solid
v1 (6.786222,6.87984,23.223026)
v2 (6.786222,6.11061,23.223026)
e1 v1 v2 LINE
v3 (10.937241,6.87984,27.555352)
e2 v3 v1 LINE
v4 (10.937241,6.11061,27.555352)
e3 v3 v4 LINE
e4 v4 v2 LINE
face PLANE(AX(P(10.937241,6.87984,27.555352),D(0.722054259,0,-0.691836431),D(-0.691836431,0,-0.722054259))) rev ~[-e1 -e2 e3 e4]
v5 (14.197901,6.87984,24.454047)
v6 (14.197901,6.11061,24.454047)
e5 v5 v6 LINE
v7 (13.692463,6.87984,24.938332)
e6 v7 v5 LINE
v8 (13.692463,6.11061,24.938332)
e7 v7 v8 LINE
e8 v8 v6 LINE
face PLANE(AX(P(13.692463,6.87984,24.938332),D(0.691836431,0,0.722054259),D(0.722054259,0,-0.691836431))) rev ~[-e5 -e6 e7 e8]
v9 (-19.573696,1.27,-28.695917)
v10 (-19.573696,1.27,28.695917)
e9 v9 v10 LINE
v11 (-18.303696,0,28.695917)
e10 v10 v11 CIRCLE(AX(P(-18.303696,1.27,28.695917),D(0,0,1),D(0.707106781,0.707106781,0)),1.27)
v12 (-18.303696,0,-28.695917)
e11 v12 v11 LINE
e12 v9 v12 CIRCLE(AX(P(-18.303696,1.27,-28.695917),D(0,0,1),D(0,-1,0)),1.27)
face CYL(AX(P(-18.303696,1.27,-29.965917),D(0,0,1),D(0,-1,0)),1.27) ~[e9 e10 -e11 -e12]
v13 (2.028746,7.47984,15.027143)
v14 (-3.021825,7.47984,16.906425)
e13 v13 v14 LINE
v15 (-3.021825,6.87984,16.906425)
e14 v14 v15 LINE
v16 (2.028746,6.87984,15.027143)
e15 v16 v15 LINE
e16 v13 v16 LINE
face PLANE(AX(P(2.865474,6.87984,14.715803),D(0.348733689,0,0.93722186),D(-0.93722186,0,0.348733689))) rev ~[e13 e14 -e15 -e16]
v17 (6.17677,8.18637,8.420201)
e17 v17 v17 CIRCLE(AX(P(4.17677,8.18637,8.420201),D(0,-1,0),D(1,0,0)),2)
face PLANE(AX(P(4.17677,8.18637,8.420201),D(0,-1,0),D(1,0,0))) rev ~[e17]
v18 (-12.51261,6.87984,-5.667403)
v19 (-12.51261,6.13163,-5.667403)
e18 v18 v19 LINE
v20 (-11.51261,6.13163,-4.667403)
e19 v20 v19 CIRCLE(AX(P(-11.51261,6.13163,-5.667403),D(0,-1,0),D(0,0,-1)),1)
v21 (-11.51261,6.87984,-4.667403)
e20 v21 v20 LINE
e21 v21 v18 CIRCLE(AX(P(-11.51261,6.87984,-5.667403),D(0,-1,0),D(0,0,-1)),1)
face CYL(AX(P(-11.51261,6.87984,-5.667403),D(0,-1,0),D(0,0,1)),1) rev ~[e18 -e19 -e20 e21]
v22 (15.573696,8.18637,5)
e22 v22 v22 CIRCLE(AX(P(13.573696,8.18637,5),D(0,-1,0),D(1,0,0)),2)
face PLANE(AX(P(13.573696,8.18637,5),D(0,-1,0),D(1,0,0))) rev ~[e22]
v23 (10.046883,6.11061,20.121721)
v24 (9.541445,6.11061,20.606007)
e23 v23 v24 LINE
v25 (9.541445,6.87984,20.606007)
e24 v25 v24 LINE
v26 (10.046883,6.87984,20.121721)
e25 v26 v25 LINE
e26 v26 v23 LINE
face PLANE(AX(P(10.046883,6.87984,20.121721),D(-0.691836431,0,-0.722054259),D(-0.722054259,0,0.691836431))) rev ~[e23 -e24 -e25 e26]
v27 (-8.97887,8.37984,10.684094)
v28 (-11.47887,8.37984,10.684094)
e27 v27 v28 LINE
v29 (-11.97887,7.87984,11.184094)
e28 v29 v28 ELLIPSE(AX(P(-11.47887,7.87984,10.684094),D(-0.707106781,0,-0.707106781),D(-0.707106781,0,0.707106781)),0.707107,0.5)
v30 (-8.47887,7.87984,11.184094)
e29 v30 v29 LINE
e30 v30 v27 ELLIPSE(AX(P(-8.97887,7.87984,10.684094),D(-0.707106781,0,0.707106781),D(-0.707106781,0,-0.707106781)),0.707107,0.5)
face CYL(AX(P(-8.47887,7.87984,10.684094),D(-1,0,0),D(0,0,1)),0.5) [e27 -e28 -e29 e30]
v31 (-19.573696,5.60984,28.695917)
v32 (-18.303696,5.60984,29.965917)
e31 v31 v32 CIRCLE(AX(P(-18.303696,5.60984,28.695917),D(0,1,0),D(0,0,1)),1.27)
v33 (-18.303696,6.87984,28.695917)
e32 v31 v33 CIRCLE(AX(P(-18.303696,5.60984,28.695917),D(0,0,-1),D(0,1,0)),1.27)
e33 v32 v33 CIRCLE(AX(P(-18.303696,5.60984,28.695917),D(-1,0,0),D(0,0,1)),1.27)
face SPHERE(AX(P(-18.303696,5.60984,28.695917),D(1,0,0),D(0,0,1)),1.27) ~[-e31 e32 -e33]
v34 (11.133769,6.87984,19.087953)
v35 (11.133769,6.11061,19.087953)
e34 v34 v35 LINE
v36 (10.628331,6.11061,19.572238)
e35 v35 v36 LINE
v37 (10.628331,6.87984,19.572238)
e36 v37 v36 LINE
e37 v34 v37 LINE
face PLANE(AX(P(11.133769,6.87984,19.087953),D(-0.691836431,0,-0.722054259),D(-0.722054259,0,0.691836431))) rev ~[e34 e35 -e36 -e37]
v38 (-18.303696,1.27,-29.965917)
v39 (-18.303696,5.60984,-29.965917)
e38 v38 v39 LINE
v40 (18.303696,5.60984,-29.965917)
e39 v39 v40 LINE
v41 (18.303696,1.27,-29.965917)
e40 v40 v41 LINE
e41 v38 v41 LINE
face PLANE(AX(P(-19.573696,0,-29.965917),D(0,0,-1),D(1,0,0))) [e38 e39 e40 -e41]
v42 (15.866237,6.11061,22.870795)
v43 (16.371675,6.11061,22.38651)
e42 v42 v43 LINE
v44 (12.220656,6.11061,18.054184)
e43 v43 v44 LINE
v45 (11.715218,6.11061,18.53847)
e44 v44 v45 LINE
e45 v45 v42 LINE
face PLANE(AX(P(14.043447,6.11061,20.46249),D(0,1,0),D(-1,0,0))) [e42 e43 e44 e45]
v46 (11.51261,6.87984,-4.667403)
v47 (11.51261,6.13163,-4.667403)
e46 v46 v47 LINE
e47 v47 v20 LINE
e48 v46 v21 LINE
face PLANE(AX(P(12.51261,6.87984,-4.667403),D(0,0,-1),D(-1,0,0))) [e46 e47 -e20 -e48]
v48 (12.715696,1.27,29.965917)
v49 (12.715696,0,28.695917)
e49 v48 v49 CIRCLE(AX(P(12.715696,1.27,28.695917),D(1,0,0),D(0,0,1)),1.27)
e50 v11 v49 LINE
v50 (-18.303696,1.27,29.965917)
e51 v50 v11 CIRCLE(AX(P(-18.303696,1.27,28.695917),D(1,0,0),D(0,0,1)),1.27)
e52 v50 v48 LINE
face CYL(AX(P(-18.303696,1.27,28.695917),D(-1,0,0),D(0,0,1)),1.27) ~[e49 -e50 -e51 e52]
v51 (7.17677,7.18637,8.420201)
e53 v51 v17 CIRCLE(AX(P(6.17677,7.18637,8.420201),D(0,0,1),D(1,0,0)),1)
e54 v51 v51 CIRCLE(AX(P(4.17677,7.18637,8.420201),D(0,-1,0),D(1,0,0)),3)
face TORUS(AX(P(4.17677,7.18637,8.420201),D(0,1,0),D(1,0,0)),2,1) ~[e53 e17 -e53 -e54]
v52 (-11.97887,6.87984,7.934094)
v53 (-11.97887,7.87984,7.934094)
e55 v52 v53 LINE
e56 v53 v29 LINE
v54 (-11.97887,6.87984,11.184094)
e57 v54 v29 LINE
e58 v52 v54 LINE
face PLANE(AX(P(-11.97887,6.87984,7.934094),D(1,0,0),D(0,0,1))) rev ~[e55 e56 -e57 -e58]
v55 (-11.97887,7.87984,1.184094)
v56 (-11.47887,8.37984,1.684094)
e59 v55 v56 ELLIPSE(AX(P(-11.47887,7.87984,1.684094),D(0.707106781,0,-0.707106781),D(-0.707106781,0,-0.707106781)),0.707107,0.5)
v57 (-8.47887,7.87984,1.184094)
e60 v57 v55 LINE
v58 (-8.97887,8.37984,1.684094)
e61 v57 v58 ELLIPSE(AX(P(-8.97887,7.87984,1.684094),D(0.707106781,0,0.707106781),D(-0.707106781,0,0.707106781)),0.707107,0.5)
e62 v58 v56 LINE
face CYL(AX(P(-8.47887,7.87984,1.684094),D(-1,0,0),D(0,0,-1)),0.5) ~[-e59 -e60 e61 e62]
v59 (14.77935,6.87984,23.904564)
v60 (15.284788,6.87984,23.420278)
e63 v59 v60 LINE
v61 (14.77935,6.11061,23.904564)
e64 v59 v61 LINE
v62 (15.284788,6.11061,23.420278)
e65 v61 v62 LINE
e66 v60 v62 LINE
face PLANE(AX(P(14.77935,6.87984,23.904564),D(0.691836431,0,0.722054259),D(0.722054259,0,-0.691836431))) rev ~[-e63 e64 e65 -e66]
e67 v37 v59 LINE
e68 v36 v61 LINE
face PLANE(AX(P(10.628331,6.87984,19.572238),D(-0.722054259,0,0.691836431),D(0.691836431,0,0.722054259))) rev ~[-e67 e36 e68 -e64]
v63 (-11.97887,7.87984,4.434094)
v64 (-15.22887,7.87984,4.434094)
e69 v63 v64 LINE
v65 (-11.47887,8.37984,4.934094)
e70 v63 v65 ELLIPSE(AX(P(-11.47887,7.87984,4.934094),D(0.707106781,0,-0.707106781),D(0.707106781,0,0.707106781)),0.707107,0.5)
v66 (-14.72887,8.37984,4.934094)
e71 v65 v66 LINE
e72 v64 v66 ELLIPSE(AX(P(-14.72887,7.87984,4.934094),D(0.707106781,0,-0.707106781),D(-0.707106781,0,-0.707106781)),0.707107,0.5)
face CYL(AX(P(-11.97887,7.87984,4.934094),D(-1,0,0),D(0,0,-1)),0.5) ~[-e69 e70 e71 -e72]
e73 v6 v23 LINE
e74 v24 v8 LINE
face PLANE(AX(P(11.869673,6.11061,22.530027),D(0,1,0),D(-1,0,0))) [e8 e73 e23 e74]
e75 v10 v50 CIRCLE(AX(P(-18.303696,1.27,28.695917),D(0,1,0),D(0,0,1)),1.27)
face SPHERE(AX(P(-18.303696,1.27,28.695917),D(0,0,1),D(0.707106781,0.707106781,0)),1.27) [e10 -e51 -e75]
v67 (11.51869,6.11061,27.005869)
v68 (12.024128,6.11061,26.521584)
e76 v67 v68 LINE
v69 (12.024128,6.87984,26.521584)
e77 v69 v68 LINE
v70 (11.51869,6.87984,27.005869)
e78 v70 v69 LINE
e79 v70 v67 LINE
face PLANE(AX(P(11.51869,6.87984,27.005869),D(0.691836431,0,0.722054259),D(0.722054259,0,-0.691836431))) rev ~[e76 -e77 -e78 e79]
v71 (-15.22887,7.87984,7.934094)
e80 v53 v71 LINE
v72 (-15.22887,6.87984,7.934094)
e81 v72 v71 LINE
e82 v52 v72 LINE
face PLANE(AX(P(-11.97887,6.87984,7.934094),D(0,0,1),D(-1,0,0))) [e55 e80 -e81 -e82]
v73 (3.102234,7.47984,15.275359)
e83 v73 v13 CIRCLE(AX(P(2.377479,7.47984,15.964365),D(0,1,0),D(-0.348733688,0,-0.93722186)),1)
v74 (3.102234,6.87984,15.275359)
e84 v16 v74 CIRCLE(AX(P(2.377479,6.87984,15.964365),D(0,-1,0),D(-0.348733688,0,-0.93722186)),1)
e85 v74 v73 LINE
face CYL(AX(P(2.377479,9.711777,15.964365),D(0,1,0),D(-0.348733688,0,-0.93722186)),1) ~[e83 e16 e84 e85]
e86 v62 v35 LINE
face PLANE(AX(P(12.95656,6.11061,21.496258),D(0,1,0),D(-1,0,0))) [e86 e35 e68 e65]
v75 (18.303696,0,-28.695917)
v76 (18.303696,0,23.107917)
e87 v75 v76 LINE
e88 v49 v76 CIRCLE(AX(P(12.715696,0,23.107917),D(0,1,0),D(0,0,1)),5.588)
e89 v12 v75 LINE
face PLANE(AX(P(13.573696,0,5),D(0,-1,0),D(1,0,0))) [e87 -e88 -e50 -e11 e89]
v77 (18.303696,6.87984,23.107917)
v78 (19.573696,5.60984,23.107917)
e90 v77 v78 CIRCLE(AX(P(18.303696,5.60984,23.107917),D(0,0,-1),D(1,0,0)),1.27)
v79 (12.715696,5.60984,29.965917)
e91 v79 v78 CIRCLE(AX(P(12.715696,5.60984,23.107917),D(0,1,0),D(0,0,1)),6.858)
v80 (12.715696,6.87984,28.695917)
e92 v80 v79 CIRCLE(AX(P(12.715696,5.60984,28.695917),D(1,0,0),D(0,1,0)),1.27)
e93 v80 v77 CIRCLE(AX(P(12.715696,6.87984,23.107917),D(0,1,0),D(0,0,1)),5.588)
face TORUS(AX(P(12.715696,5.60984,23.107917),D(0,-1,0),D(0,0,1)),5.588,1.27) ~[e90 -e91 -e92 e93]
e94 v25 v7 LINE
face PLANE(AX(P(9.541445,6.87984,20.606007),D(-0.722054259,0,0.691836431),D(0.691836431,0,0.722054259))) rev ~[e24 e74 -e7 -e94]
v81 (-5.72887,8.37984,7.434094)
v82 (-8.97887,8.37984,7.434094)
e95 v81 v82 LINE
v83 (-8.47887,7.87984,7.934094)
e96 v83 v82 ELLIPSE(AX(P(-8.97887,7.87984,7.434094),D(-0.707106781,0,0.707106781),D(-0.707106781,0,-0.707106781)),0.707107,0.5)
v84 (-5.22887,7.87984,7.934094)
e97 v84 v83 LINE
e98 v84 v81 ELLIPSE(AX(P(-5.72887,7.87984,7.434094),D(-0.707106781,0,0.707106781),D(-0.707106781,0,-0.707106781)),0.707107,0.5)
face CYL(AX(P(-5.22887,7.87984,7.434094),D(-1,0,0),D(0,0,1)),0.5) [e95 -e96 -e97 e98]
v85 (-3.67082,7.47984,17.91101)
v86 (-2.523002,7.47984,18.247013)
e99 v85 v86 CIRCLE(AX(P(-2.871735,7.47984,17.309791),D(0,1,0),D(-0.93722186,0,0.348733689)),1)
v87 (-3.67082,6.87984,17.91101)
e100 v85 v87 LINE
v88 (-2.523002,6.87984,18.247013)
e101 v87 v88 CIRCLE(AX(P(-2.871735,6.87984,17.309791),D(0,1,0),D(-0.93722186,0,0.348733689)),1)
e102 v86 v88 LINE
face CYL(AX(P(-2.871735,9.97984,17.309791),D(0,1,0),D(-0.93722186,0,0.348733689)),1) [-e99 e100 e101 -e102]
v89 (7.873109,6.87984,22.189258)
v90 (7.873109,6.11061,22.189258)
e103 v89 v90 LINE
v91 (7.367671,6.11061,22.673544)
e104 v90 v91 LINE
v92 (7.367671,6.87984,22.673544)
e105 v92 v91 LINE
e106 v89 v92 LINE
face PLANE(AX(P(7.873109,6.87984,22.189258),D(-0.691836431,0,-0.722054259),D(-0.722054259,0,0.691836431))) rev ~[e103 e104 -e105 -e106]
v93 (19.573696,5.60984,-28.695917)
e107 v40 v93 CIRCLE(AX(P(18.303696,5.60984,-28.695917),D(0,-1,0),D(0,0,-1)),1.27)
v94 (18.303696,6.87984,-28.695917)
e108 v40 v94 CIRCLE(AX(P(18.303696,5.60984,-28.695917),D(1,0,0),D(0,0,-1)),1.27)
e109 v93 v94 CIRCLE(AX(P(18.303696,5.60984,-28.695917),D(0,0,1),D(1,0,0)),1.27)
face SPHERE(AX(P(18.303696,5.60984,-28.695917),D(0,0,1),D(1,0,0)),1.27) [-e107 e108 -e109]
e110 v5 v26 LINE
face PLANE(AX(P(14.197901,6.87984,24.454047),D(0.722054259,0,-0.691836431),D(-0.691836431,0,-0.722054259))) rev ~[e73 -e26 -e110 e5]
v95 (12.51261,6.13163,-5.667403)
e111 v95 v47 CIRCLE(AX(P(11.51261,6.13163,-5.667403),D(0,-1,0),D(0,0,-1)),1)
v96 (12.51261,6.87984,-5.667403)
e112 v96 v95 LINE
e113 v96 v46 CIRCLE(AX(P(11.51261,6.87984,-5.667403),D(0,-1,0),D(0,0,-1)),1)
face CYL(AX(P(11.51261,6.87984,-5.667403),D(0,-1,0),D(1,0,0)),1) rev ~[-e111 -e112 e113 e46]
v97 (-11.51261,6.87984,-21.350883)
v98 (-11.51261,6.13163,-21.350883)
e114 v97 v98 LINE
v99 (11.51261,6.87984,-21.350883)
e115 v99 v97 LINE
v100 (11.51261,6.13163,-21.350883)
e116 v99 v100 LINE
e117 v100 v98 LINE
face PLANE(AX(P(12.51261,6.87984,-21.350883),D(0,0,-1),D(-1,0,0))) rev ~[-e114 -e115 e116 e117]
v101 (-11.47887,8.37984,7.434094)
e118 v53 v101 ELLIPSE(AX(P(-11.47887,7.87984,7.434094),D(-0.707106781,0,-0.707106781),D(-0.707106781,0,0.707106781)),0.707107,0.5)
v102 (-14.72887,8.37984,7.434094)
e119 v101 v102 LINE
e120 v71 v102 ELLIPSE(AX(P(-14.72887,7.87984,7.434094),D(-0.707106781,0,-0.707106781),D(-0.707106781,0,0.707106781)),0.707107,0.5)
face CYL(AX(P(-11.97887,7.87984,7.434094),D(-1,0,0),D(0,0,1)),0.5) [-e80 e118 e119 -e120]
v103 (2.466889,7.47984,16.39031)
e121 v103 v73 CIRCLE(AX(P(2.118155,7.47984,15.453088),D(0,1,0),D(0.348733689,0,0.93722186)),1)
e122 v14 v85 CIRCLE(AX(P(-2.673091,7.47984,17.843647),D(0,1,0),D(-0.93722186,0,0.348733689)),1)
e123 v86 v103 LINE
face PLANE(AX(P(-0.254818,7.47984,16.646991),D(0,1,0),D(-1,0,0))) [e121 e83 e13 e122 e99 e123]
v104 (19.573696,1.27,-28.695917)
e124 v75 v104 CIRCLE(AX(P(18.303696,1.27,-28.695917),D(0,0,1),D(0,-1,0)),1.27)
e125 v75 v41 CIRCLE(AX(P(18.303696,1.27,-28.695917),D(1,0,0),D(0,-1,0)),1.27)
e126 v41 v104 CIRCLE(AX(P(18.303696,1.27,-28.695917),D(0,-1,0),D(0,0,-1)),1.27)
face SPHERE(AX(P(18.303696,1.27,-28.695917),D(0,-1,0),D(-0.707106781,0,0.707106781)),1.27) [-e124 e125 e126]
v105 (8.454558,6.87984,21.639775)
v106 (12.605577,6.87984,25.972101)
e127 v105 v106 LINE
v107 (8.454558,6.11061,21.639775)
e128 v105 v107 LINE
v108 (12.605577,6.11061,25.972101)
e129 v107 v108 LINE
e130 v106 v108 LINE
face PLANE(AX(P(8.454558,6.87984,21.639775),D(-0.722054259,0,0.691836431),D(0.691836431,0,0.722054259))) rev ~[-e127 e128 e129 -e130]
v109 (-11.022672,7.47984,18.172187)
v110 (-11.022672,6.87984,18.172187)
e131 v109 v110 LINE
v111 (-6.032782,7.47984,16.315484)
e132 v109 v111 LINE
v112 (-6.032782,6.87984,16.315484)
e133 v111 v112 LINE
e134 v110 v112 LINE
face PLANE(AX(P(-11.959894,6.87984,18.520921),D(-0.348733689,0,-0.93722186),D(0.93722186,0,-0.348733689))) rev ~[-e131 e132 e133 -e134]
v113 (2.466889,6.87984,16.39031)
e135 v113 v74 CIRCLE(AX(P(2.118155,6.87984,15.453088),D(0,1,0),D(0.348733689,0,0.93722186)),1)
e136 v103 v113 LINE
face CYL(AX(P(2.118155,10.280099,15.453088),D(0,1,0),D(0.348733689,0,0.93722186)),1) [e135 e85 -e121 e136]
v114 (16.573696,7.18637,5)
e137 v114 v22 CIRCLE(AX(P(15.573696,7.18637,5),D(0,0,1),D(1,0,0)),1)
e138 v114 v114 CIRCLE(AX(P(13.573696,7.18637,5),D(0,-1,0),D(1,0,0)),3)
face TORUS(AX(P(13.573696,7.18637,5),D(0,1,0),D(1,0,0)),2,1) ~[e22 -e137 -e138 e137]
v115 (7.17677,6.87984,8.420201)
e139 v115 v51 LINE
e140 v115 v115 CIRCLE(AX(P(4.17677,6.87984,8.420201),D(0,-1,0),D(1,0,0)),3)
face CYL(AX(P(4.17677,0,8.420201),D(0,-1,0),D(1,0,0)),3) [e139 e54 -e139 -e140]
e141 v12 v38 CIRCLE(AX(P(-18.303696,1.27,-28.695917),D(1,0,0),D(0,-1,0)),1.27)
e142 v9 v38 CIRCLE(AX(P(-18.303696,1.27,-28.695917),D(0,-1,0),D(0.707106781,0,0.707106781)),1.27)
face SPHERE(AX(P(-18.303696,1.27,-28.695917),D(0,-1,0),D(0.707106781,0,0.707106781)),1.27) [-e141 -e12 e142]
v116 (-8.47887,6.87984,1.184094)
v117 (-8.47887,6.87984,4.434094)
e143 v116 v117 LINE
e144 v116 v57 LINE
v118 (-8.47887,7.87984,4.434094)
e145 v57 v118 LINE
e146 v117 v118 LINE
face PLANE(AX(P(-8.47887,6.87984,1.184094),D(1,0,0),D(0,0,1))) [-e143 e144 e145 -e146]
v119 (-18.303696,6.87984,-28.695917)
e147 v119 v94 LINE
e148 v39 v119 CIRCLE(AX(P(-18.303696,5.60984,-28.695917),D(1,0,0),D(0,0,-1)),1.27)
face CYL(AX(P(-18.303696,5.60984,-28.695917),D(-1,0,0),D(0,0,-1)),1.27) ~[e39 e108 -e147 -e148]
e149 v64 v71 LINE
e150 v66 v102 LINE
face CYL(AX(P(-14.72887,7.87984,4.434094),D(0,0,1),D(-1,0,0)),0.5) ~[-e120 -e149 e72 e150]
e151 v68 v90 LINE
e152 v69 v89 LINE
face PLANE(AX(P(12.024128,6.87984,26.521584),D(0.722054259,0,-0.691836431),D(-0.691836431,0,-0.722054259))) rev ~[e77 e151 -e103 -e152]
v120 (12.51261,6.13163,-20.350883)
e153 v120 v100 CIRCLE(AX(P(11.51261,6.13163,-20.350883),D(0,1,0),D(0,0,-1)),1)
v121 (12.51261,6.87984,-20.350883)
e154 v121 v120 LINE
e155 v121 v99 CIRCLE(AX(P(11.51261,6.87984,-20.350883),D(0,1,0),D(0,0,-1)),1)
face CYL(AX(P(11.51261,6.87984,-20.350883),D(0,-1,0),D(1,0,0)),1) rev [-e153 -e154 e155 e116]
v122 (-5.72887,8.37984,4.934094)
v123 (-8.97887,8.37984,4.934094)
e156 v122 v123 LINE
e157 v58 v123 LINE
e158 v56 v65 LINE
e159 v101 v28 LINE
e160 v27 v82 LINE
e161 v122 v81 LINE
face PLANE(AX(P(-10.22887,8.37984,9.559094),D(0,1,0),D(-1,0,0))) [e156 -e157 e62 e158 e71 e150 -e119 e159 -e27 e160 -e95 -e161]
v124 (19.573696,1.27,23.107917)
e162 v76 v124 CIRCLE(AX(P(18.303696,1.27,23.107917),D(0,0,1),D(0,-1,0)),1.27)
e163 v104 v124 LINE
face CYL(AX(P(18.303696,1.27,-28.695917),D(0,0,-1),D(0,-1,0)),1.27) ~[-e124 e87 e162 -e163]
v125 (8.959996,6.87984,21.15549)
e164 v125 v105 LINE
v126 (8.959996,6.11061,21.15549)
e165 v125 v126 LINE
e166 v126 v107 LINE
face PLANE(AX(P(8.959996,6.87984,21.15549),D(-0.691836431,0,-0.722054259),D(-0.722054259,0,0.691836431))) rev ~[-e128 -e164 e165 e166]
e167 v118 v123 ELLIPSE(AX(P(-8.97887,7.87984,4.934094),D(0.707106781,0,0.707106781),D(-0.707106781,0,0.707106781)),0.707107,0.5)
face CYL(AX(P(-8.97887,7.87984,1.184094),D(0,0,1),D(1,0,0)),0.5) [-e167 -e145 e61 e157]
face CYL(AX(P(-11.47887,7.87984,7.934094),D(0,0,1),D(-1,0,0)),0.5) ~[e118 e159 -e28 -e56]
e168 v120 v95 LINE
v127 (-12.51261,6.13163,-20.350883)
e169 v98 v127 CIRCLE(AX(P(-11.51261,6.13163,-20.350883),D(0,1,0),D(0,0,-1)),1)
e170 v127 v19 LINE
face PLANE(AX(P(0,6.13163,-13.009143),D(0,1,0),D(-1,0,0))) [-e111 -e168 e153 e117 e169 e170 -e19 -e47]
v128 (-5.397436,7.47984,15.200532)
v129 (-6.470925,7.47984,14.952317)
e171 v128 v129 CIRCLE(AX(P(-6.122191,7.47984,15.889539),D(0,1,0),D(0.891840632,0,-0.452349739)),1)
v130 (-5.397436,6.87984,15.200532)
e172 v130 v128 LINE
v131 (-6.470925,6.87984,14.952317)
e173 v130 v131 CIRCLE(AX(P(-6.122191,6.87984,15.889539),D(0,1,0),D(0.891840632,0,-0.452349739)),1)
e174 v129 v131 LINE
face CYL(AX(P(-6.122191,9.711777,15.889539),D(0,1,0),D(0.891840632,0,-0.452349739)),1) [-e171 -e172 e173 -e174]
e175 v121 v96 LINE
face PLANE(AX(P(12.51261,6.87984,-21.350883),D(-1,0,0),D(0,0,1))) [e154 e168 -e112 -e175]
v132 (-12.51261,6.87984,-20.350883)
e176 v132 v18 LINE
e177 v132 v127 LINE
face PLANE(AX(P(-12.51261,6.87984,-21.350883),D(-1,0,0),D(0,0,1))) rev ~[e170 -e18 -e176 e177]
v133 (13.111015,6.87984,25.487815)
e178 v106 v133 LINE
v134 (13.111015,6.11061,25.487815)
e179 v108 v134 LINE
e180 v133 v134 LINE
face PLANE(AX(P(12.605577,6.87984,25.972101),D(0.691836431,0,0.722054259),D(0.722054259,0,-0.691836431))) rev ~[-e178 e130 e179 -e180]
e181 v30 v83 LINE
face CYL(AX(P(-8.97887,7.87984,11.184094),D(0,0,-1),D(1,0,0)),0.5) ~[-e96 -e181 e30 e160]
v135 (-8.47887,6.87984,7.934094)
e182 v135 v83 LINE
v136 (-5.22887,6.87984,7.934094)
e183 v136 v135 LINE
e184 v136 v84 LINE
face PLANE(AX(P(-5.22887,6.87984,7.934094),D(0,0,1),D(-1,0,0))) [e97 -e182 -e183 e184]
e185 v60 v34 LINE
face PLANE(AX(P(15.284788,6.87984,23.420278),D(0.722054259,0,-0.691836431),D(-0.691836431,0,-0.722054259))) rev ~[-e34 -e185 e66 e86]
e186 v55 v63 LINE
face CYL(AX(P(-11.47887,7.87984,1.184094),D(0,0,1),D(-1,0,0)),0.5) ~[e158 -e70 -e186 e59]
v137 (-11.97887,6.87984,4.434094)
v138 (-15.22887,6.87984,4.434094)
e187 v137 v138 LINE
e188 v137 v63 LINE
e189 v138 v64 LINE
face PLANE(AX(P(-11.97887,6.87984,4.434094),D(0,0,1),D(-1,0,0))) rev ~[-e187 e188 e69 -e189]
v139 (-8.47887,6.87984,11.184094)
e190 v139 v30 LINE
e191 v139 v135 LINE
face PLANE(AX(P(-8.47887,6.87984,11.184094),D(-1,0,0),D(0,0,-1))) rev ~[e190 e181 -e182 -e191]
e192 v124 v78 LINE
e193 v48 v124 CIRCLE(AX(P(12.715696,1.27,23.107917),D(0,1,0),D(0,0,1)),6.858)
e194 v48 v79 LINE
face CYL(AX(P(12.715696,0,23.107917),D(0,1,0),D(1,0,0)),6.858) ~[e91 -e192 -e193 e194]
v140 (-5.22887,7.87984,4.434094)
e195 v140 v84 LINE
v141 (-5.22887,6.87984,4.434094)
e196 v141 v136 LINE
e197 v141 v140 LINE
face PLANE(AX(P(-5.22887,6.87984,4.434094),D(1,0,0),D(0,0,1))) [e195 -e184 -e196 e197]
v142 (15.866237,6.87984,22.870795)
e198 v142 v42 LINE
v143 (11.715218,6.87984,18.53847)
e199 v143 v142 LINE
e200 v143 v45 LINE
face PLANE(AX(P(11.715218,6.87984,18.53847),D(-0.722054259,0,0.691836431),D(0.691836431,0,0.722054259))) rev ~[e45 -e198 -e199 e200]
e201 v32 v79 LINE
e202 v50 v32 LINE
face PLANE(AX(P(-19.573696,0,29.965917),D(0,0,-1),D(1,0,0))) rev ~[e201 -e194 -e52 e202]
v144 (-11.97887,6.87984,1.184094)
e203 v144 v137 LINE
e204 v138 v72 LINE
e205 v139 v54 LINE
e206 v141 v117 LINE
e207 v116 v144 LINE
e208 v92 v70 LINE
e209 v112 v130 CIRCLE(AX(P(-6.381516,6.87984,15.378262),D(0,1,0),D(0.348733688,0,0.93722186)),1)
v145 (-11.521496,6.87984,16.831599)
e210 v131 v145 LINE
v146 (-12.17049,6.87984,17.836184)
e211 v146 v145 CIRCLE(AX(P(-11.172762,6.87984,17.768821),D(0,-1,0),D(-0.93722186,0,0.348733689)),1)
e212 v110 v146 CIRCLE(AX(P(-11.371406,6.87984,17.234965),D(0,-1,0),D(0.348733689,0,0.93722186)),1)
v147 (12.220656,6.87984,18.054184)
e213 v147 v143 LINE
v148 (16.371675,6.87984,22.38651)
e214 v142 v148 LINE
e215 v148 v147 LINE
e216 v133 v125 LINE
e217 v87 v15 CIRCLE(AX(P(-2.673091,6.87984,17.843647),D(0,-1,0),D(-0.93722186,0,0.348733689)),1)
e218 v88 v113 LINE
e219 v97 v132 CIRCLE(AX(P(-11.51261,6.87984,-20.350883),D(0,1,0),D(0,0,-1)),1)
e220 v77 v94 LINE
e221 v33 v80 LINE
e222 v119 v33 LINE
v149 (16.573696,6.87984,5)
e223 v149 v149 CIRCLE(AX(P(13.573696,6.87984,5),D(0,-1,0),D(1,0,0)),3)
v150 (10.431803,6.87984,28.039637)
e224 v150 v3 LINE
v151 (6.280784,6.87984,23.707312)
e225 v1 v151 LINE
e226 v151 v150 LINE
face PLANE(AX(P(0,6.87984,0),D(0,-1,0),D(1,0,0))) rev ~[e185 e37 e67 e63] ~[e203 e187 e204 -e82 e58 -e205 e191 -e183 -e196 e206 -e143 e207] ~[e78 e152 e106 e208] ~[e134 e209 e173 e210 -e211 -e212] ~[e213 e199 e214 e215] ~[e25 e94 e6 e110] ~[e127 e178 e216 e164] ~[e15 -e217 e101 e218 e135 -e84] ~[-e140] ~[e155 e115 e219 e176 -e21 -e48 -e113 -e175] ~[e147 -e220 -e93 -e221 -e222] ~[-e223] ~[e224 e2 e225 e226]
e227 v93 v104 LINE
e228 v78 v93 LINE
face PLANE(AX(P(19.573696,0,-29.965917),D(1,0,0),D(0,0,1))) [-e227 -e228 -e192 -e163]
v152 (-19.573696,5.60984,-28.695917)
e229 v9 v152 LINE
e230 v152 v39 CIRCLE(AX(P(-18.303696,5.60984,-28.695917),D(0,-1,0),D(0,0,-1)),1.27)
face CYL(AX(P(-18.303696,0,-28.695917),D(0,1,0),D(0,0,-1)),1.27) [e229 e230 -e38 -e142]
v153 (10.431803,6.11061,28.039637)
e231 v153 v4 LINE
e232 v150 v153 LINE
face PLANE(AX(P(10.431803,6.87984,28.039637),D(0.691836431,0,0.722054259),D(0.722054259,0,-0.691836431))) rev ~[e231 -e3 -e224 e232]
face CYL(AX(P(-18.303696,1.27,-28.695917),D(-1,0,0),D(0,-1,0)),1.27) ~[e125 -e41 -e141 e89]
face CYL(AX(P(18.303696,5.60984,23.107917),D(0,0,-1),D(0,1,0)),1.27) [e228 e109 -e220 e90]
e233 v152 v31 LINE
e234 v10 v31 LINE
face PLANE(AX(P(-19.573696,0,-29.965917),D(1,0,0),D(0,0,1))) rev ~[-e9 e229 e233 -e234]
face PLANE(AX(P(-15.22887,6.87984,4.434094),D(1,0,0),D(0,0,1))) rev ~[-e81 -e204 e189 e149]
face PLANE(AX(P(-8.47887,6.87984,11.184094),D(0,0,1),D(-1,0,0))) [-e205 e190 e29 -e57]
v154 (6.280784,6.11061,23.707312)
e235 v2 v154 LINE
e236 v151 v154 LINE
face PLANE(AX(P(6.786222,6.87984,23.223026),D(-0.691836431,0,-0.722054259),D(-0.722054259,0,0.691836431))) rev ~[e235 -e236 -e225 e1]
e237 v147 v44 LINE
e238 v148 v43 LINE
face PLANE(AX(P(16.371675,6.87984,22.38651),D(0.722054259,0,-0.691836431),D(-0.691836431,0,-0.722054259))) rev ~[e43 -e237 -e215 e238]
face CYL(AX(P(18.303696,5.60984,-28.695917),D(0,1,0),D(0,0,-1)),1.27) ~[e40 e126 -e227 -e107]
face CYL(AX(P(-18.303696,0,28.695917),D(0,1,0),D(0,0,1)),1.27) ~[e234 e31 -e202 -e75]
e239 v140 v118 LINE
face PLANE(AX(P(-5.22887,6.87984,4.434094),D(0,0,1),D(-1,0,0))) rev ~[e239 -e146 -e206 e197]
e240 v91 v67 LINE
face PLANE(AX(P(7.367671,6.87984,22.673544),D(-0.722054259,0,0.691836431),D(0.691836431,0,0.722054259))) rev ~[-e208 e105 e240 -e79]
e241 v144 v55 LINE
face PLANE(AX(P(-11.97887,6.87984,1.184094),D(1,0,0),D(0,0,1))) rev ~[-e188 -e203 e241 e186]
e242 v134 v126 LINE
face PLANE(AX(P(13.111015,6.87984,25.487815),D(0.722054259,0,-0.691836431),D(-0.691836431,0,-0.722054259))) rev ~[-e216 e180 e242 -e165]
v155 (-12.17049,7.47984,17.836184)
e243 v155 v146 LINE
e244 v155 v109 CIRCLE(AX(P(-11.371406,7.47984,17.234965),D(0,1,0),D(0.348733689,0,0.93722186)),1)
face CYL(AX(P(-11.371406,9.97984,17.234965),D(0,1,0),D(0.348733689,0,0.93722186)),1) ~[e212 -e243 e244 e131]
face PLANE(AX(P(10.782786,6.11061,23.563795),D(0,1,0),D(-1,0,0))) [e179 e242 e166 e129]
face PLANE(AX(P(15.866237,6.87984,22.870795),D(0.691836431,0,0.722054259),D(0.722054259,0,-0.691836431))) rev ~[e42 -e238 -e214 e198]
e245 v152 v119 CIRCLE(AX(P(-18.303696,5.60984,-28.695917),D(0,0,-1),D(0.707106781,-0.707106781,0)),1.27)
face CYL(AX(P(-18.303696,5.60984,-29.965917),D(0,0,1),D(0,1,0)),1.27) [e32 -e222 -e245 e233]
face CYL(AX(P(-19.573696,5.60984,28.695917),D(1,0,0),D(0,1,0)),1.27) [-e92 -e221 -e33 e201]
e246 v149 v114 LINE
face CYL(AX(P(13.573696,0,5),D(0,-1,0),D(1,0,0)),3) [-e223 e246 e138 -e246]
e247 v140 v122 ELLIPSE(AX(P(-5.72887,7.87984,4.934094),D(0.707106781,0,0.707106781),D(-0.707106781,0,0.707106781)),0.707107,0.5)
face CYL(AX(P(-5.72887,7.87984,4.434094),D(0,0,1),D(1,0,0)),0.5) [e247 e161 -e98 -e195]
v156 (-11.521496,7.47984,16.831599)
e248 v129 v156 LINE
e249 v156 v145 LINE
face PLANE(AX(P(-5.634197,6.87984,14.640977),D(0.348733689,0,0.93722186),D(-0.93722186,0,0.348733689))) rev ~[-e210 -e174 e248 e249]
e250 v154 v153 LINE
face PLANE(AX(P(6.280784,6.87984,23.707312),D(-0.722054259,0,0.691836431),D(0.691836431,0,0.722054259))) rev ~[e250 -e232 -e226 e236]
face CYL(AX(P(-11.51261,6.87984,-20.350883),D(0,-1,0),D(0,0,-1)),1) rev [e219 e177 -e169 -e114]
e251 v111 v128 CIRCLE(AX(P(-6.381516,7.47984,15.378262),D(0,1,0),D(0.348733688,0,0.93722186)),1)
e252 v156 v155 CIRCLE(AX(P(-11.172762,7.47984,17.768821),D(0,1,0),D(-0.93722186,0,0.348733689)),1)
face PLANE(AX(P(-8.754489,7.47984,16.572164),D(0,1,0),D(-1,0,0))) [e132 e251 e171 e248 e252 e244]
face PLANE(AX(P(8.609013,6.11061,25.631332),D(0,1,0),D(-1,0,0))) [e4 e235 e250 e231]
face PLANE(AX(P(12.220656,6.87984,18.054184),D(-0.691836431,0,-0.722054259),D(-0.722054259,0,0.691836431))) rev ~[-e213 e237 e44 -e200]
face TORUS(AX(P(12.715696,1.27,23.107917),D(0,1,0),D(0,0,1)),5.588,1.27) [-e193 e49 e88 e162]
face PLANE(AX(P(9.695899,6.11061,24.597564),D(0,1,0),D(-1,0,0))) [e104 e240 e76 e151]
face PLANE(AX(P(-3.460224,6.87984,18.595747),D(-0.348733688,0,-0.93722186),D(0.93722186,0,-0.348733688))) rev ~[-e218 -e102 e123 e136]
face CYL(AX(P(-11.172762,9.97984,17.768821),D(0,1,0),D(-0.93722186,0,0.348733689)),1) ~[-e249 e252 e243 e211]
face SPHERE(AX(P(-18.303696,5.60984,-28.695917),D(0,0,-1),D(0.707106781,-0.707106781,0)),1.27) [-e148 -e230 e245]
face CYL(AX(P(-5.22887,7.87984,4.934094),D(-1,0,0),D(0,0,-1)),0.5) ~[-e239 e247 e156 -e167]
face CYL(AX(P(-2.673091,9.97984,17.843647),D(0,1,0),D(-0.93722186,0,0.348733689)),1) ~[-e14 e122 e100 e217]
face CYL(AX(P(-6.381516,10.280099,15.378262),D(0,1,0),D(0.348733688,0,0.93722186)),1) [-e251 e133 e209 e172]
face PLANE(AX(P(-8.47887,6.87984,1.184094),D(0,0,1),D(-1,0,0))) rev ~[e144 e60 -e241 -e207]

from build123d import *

# Parameters (mm, degrees)
F0_W         = 39.1473919153
F0_H         = 59.931833297
F1_DEPTH     = 6.87984
F2_R         = 6.858
F3_R         = 1.27
F4_T1_DEPTH  = 31.0193919153
F4_T3_DEPTH  = 36.6073919153
F4_T5_DEPTH  = 4.33984
F4_T7_DEPTH  = 51.803833297
F4_S11_W     = 1.27
F4_S11_H     = 1.27
F4_T12_DEPTH = 1.27
F4_S17_W     = 1.27
F4_S17_H     = 1.27
F4_T18_DEPTH = 1.27
F4_S23_W     = 1.27
F4_S23_H     = 1.27
F4_T24_DEPTH = 1.27
F4_S29_W     = 1.27
F4_S29_H     = 1.27
F4_T30_DEPTH = 1.27
F4_T34_ANGLE = 90
F4_T36_ANGLE = 90
F5_R         = 3
F6_DEPTH     = 8.18637
F7_R         = 1
F8_W         = 3.5
F8_H         = 3.25
F8_H_2       = 3.5
F8_W_2       = 3.25
F9_DEPTH     = 1.5
F10_R        = 0.5
F11_W        = 25.0252205878
F11_H        = 16.683479771
F12_DEPTH    = 0.74821
F14_DEPTH    = 0.76923
F16_DEPTH    = 0.6
F17_DEPTH    = 0.6
F18_T1_DEPTH = 2.831936667
F18_T3_DEPTH = 3.1
F18_T5_DEPTH = 3.4002586688
F19_T1_DEPTH = 3.1
F19_T3_DEPTH = 3.4002586688
F19_T5_DEPTH = 2.831936667
F20_R        = 1
F21_R        = 1
F22_R        = 1


# Not quite as in the source:
# - a fillet or chamfer that OpenCascade refuses, or shapes differently, is made with other operations: its cross-section is extruded or revolved along the edge and cut away or added


with BuildPart() as f1:
    # F0 (on Front) → F1 (new body)
    with BuildSketch(Plane.XZ):
        Rectangle(F0_W, F0_H)
    extrude(amount=-F1_DEPTH)

    # F2
    f2_edges = [f1.edges().sort_by_distance(p)[0] for p in [
        (19.573696, 3.43992, 29.965917),
    ]]
    fillet(f2_edges, radius=F2_R)

    # F3
    f3_edges = [f1.edges().sort_by_distance(p)[0] for p in [
        (-3.429, 6.87984, 29.965917),
        (-19.573696, 3.43992, 29.965917),
        (-19.573696, 3.43992, -29.965917),
        (-19.573696, 6.87984, 0),
        (-19.573696, 0, 0),
    ]]
    fillet(f3_edges, radius=F3_R)

    # F4: fillet of radius 1.27 on 3 edges, made by hand

    # F4_s2 → F4_t1 (cut)
    with BuildSketch(Plane.YZ.offset(-18.3036959577)):
        with BuildLine():
            ThreePointArc((1.27, 29.9659166485), (0.3719743879, 29.5939422606), (0, 28.6959166485))
            Line((0, 28.6959166485), (0, 29.9659166485))
            Line((0, 29.9659166485), (1.27, 29.9659166485))
        make_face()
    extrude(amount=F4_T1_DEPTH, mode=Mode.SUBTRACT)

    # F4_s4 → F4_t3 (cut)
    with BuildSketch(Plane.YZ.offset(-18.3036959577)):
        with BuildLine():
            ThreePointArc((5.60984, -29.9659166485), (6.5078656121, -29.5939422606), (6.87984, -28.6959166485))
            Line((6.87984, -28.6959166485), (6.87984, -29.9659166485))
            Line((6.87984, -29.9659166485), (5.60984, -29.9659166485))
        make_face()
        with BuildLine():
            ThreePointArc((0, -28.6959166485), (0.3719743879, -29.5939422606), (1.27, -29.9659166485))
            Line((1.27, -29.9659166485), (0, -29.9659166485))
            Line((0, -29.9659166485), (0, -28.6959166485))
        make_face()
    extrude(amount=F4_T3_DEPTH, mode=Mode.SUBTRACT)

    # F4_s6 → F4_t5 (cut)
    with BuildSketch(Plane.XZ.offset(-5.60984)):
        with BuildLine():
            ThreePointArc((18.3036959577, -29.9659166485), (19.2017215698, -29.5939422606), (19.5736959577, -28.6959166485))
            Line((19.5736959577, -28.6959166485), (19.5736959577, -29.9659166485))
            Line((19.5736959577, -29.9659166485), (18.3036959577, -29.9659166485))
        make_face()
    extrude(amount=F4_T5_DEPTH, mode=Mode.SUBTRACT)

    # F4_s8 → F4_t7 (cut)
    with BuildSketch(Plane.XY.offset(-28.6959166485)):
        with BuildLine():
            ThreePointArc((18.3036959577, 0), (19.2017215698, 0.3719743879), (19.5736959577, 1.27))
            Line((19.5736959577, 1.27), (19.5736959577, 0))
            Line((19.5736959577, 0), (18.3036959577, 0))
        make_face()
    extrude(amount=F4_T7_DEPTH, mode=Mode.SUBTRACT)


with BuildPart() as f4_tool10:
    # F4_s11 → F4_t12 (new body)
    with BuildSketch(Plane.XZ.offset(-1.27)):
        with Locations((-18.9386959577, -29.3309166485)):
            Rectangle(F4_S11_W, F4_S11_H)
    extrude(amount=F4_T12_DEPTH)

    # F4_s13 → F4_t14 (revolve, cut)
    with BuildSketch(Plane(origin=(-18.3036959577, 1.27, -28.6959166485), x_dir=(0.7071067812, 0, 0.7071067812), z_dir=(0.7071067812, 0, -0.7071067812))):
        with BuildLine():
            ThreePointArc((0, -1.27), (1.27, 0), (0, 1.27))
            Line((0, 1.27), (0, -1.27))
        make_face()
    revolve(axis=Axis((-18.3036959577, 1.27, -28.6959166485), (0, -1, 0)), mode=Mode.SUBTRACT)


with BuildPart() as f1_1:
    add(f1.part)

    # F4_t9: cut F4_tool10
    add(f4_tool10.part, mode=Mode.SUBTRACT)


with BuildPart() as f4_tool16:
    # F4_s17 → F4_t18 (new body)
    with BuildSketch(Plane.XY.offset(-28.6959166485)):
        with Locations((-18.9386959577, 6.24484)):
            Rectangle(F4_S17_W, F4_S17_H)
    extrude(amount=-F4_T18_DEPTH)

    # F4_s19 → F4_t20 (revolve, cut)
    with BuildSketch(Plane(origin=(-18.3036959577, 5.60984, -28.6959166485), x_dir=(0.7071067812, -0.7071067812, 0), z_dir=(0.7071067812, 0.7071067812, 0))):
        with BuildLine():
            ThreePointArc((0, -1.27), (1.27, 0), (0, 1.27))
            Line((0, 1.27), (0, -1.27))
        make_face()
    revolve(axis=Axis((-18.3036959577, 5.60984, -28.6959166485), (0, 0, -1)), mode=Mode.SUBTRACT)


with BuildPart() as f1_2:
    add(f1_1.part)

    # F4_t15: cut F4_tool16
    add(f4_tool16.part, mode=Mode.SUBTRACT)


with BuildPart() as f4_tool22:
    # F4_s23 → F4_t24 (new body)
    with BuildSketch(Plane.XY.offset(28.6959166485)):
        with Locations((-18.9386959577, 0.635)):
            Rectangle(F4_S23_W, F4_S23_H)
    extrude(amount=F4_T24_DEPTH)

    # F4_s25 → F4_t26 (revolve, cut)
    with BuildSketch(Plane(origin=(-18.3036959577, 1.27, 28.6959166485), x_dir=(0.7071067812, 0.7071067812, 0), z_dir=(0.7071067812, -0.7071067812, 0))):
        with BuildLine():
            ThreePointArc((0, -1.27), (1.27, 0), (0, 1.27))
            Line((0, 1.27), (0, -1.27))
        make_face()
    revolve(axis=Axis((-18.3036959577, 1.27, 28.6959166485), (0, 0, 1)), mode=Mode.SUBTRACT)


with BuildPart() as f1_3:
    add(f1_2.part)

    # F4_t21: cut F4_tool22
    add(f4_tool22.part, mode=Mode.SUBTRACT)


with BuildPart() as f4_tool28:
    # F4_s29 → F4_t30 (new body)
    with BuildSketch(Plane.XZ.offset(-1.27)):
        with Locations((18.9386959577, -29.3309166485)):
            Rectangle(F4_S29_W, F4_S29_H)
    extrude(amount=F4_T30_DEPTH)

    # F4_s31 → F4_t32 (revolve, cut)
    with BuildSketch(Plane(origin=(18.3036959577, 1.27, -28.6959166485), x_dir=(-0.7071067812, 0, 0.7071067812), z_dir=(0.7071067812, 0, 0.7071067812))):
        with BuildLine():
            ThreePointArc((0, -1.27), (1.27, 0), (0, 1.27))
            Line((0, 1.27), (0, -1.27))
        make_face()
    revolve(axis=Axis((18.3036959577, 1.27, -28.6959166485), (0, -1, 0)), mode=Mode.SUBTRACT)


with BuildPart() as f1_4:
    add(f1_3.part)

    # F4_t27: cut F4_tool28
    add(f4_tool28.part, mode=Mode.SUBTRACT)

    # F4_s33 → F4_t34 (revolve, cut)
    with BuildSketch(Plane.XZ.offset(-5.60984)):
        with BuildLine():
            ThreePointArc((18.3036959577, -29.9659166485), (19.2017215698, -29.5939422606), (19.5736959577, -28.6959166485))
            Line((19.5736959577, -28.6959166485), (19.5736959577, -29.9659166485))
            Line((19.5736959577, -29.9659166485), (18.3036959577, -29.9659166485))
        make_face()
    revolve(axis=Axis((18.3036959577, 5.60984, -29.9659166485), (0, 0, 1)), revolution_arc=F4_T34_ANGLE, mode=Mode.SUBTRACT)

    # F4_s35 → F4_t36 (revolve, cut)
    with BuildSketch(Plane.YZ.offset(12.7156959577)):
        with BuildLine():
            ThreePointArc((0, 28.6959166485), (0.3719743879, 29.5939422606), (1.27, 29.9659166485))
            Line((1.27, 29.9659166485), (0, 29.9659166485))
            Line((0, 29.9659166485), (0, 28.6959166485))
        make_face()
    revolve(axis=Axis((12.7156959577, 0, 23.1079166485), (0, 1, 0)), revolution_arc=F4_T36_ANGLE, mode=Mode.SUBTRACT)

    # F5 (on Front) → F6 (join)
    with BuildSketch(Plane.XZ):
        with Locations((13.5736959577, 5)):
            Circle(F5_R)
        with Locations((4.1767697498, 8.4202014333)):
            Circle(F5_R)
    extrude(amount=-F6_DEPTH)

    # F7
    f7_edges = [f1_4.edges().sort_by_distance(p)[0] for p in [
        (1.17677, 8.18637, 8.420201),
        (10.573696, 8.18637, 5),
    ]]
    fillet(f7_edges, radius=F7_R)

    # F8 (on face) → F9 (join)
    with BuildSketch(Plane(origin=(0, 6.87984, 0), x_dir=(-1, 0, 0), z_dir=(0, 1, 0))):
        with Locations((10.2288695052, 9.5590941198)):
            Rectangle(F8_W, F8_H)
        with Locations((10.2288695052, 6.1840941198)):
            Rectangle(F8_W, F8_H_2)
        with Locations((6.8538695052, 6.1840941198)):
            Rectangle(F8_W_2, F8_H_2)
        with Locations((13.6038695052, 6.1840941198)):
            Rectangle(F8_W_2, F8_H_2)
        with Locations((10.2288695052, 2.8090941198)):
            Rectangle(F8_W, F8_H)
    extrude(amount=F9_DEPTH)

    # F10
    f10_edges = [f1_4.edges().sort_by_distance(p)[0] for p in [
        (-8.47887, 8.37984, 9.559094),
        (-6.85387, 8.37984, 7.934094),
        (-5.22887, 8.37984, 6.184094),
        (-6.85387, 8.37984, 4.434094),
        (-8.47887, 8.37984, 2.809094),
        (-10.22887, 8.37984, 1.184094),
        (-11.97887, 8.37984, 2.809094),
        (-13.60387, 8.37984, 4.434094),
        (-15.22887, 8.37984, 6.184094),
        (-13.60387, 8.37984, 7.934094),
        (-11.97887, 8.37984, 9.559094),
        (-10.22887, 8.37984, 11.184094),
    ]]
    fillet(f10_edges, radius=F10_R)

    # F11 (on face) → F12 (cut)
    with BuildSketch(Plane(origin=(0, 6.87984, 0), x_dir=(-1, 0, 0), z_dir=(0, 1, 0))):
        with Locations((0, -13.0091430619)):
            Rectangle(F11_W, F11_H)
    extrude(amount=-F12_DEPTH, mode=Mode.SUBTRACT)

    # F13 (on face) → F14 (cut)
    with BuildSketch(Plane(origin=(0, 6.87984, 0), x_dir=(-1, 0, 0), z_dir=(0, 1, 0))):
        Polygon((-15.8662368542, 22.8707954266), (-16.3716748357, 22.3865099251), (-12.2206562519, 18.0541843698), (-11.7152182705, 18.5384698712), align=None)
        Polygon((-11.1337694753, 19.0879527843), (-10.6283314938, 19.5722382857), (-14.7793500776, 23.904563841), (-15.284788059, 23.4202783396), align=None)
        Polygon((-10.0468826986, 20.1217211988), (-9.5414447172, 20.6060067002), (-13.6924633009, 24.9383322555), (-14.1979012824, 24.4540467541), align=None)
        Polygon((-8.959995922, 21.1554896132), (-8.4545579406, 21.6397751147), (-12.6055765243, 25.97210067), (-13.1110145058, 25.4878151686), align=None)
        Polygon((-7.8731091454, 22.1892580277), (-7.3676711639, 22.6735435291), (-11.5186897477, 27.0058690845), (-12.0241277291, 26.521583583), align=None)
        Polygon((-6.7862223687, 23.2230264422), (-6.2807843873, 23.7073119436), (-10.431802971, 28.0396374989), (-10.9372409525, 27.5553519975), align=None)
    extrude(amount=-F14_DEPTH, mode=Mode.SUBTRACT)

    # F15 (on face) → F16 (join)
    with BuildSketch(Plane(origin=(0, 6.87984, 0), x_dir=(-1, 0, 0), z_dir=(0, 1, 0))):
        Polygon((4.9829966579, 15.9248658988), (5.6341970339, 14.6409766749), (12.4587174505, 17.180332914), (11.9598941685, 18.5209205872), align=None)
    extrude(amount=F16_DEPTH)

    # F15 (on face) → F17 (join)
    with BuildSketch(Plane(origin=(0, 6.87984, 0), x_dir=(-1, 0, 0), z_dir=(0, 1, 0))):
        Polygon((4.9829966579, 15.9248658988), (5.6341970339, 14.6409766749), (12.4587174505, 17.180332914), (11.9598941685, 18.5209205872), align=None)
        Polygon((-3.5166739851, 15.999692095), (-2.8654736091, 14.715802871), (3.9590468074, 17.2551591101), (3.4602235255, 18.5957467833), align=None)
    extrude(amount=F17_DEPTH)

    # F18: fillet of radius 1 on 4 edges, made by hand

    # F18_s2 → F18_t1 (cut)
    with BuildSketch(Plane.XZ.offset(-9.711776667)):
        with BuildLine():
            ThreePointArc((-5.2303506466, 15.4371893983), (-5.7581630774, 14.9581512114), (-6.4709249675, 14.9523172774))
            Line((-6.4709249675, 14.9523172774), (-5.6341970339, 14.6409766749))
            Line((-5.6341970339, 14.6409766749), (-5.2303506466, 15.4371893983))
        make_face()
    extrude(amount=F18_T1_DEPTH, mode=Mode.SUBTRACT)

    # F18_s4 → F18_t3 (cut)
    with BuildSketch(Plane.XZ.offset(-9.97984)):
        with BuildLine():
            ThreePointArc((-12.109983762, 18.1175547738), (-12.0820697907, 17.3526971087), (-11.5214955907, 16.8315992255))
            Line((-11.5214955907, 16.8315992255), (-12.4587174505, 17.180332914))
            Line((-12.4587174505, 17.180332914), (-12.109983762, 18.1175547738))
        make_face()
        with BuildLine():
            ThreePointArc((-11.0226723087, 18.1721868987), (-11.7875299738, 18.1442729274), (-12.308627857, 17.5836987274))
            Line((-12.308627857, 17.5836987274), (-11.9598941685, 18.5209205872))
            Line((-11.9598941685, 18.5209205872), (-11.0226723087, 18.1721868987))
        make_face()
    extrude(amount=F18_T3_DEPTH, mode=Mode.SUBTRACT)

    # F18_s6 → F18_t5 (cut)
    with BuildSketch(Plane.XZ.offset(-10.2800986688)):
        with BuildLine():
            ThreePointArc((-6.032782113, 16.3154837126), (-5.4501278756, 15.7422900544), (-5.489675169, 14.9259121139))
            Line((-5.489675169, 14.9259121139), (-4.9829966579, 15.9248658988))
            Line((-4.9829966579, 15.9248658988), (-6.032782113, 16.3154837126))
        make_face()
    extrude(amount=F18_T5_DEPTH, mode=Mode.SUBTRACT)

    # F19: fillet of radius 1 on 4 edges, made by hand

    # F19_s2 → F19_t1 (cut)
    with BuildSketch(Plane.XZ.offset(-9.97984)):
        with BuildLine():
            ThreePointArc((-3.808957214, 17.6585249235), (-3.2878593307, 18.2190991235), (-2.5230016657, 18.2470130948))
            Line((-2.5230016657, 18.2470130948), (-3.4602235255, 18.5957467833))
            Line((-3.4602235255, 18.5957467833), (-3.808957214, 17.6585249235))
        make_face()
        with BuildLine():
            ThreePointArc((-3.6103131189, 18.1923809699), (-3.5823991476, 17.4275233048), (-3.0218249476, 16.9064254216))
            Line((-3.0218249476, 16.9064254216), (-3.9590468074, 17.2551591101))
            Line((-3.9590468074, 17.2551591101), (-3.6103131189, 18.1923809699))
        make_face()
    extrude(amount=F19_T1_DEPTH, mode=Mode.SUBTRACT)

    # F19_s4 → F19_t3 (cut)
    with BuildSketch(Plane.XZ.offset(-10.2800986688)):
        with BuildLine():
            ThreePointArc((2.4668885301, 16.3903099087), (3.0495427674, 15.8171162505), (3.0099954741, 15.00073831))
            Line((3.0099954741, 15.00073831), (3.5166739851, 15.999692095))
            Line((3.5166739851, 15.999692095), (2.4668885301, 16.3903099087))
        make_face()
    extrude(amount=F19_T3_DEPTH, mode=Mode.SUBTRACT)

    # F19_s6 → F19_t5 (cut)
    with BuildSketch(Plane.XZ.offset(-9.711776667)):
        with BuildLine():
            ThreePointArc((2.0287456755, 15.0271434735), (2.7415075656, 15.0329774075), (3.2693199965, 15.5120155945))
            Line((3.2693199965, 15.5120155945), (2.8654736091, 14.715802871))
            Line((2.8654736091, 14.715802871), (2.0287456755, 15.0271434735))
        make_face()
    extrude(amount=F19_T5_DEPTH, mode=Mode.SUBTRACT)

    # F20
    f20_edges = [f1_4.edges().sort_by_distance(p)[0] for p in [
        (12.51261, 6.505735, -21.350883),
    ]]
    fillet(f20_edges, radius=F20_R)

    # F21
    f21_edges = [f1_4.edges().sort_by_distance(p)[0] for p in [
        (12.51261, 6.505735, -4.667403),
    ]]
    fillet(f21_edges, radius=F21_R)

    # F22
    f22_edges = [f1_4.edges().sort_by_distance(p)[0] for p in [
        (-12.51261, 6.505735, -4.667403),
        (-12.51261, 6.505735, -21.350883),
    ]]
    fillet(f22_edges, radius=F22_R)


solid = f1_4.part
